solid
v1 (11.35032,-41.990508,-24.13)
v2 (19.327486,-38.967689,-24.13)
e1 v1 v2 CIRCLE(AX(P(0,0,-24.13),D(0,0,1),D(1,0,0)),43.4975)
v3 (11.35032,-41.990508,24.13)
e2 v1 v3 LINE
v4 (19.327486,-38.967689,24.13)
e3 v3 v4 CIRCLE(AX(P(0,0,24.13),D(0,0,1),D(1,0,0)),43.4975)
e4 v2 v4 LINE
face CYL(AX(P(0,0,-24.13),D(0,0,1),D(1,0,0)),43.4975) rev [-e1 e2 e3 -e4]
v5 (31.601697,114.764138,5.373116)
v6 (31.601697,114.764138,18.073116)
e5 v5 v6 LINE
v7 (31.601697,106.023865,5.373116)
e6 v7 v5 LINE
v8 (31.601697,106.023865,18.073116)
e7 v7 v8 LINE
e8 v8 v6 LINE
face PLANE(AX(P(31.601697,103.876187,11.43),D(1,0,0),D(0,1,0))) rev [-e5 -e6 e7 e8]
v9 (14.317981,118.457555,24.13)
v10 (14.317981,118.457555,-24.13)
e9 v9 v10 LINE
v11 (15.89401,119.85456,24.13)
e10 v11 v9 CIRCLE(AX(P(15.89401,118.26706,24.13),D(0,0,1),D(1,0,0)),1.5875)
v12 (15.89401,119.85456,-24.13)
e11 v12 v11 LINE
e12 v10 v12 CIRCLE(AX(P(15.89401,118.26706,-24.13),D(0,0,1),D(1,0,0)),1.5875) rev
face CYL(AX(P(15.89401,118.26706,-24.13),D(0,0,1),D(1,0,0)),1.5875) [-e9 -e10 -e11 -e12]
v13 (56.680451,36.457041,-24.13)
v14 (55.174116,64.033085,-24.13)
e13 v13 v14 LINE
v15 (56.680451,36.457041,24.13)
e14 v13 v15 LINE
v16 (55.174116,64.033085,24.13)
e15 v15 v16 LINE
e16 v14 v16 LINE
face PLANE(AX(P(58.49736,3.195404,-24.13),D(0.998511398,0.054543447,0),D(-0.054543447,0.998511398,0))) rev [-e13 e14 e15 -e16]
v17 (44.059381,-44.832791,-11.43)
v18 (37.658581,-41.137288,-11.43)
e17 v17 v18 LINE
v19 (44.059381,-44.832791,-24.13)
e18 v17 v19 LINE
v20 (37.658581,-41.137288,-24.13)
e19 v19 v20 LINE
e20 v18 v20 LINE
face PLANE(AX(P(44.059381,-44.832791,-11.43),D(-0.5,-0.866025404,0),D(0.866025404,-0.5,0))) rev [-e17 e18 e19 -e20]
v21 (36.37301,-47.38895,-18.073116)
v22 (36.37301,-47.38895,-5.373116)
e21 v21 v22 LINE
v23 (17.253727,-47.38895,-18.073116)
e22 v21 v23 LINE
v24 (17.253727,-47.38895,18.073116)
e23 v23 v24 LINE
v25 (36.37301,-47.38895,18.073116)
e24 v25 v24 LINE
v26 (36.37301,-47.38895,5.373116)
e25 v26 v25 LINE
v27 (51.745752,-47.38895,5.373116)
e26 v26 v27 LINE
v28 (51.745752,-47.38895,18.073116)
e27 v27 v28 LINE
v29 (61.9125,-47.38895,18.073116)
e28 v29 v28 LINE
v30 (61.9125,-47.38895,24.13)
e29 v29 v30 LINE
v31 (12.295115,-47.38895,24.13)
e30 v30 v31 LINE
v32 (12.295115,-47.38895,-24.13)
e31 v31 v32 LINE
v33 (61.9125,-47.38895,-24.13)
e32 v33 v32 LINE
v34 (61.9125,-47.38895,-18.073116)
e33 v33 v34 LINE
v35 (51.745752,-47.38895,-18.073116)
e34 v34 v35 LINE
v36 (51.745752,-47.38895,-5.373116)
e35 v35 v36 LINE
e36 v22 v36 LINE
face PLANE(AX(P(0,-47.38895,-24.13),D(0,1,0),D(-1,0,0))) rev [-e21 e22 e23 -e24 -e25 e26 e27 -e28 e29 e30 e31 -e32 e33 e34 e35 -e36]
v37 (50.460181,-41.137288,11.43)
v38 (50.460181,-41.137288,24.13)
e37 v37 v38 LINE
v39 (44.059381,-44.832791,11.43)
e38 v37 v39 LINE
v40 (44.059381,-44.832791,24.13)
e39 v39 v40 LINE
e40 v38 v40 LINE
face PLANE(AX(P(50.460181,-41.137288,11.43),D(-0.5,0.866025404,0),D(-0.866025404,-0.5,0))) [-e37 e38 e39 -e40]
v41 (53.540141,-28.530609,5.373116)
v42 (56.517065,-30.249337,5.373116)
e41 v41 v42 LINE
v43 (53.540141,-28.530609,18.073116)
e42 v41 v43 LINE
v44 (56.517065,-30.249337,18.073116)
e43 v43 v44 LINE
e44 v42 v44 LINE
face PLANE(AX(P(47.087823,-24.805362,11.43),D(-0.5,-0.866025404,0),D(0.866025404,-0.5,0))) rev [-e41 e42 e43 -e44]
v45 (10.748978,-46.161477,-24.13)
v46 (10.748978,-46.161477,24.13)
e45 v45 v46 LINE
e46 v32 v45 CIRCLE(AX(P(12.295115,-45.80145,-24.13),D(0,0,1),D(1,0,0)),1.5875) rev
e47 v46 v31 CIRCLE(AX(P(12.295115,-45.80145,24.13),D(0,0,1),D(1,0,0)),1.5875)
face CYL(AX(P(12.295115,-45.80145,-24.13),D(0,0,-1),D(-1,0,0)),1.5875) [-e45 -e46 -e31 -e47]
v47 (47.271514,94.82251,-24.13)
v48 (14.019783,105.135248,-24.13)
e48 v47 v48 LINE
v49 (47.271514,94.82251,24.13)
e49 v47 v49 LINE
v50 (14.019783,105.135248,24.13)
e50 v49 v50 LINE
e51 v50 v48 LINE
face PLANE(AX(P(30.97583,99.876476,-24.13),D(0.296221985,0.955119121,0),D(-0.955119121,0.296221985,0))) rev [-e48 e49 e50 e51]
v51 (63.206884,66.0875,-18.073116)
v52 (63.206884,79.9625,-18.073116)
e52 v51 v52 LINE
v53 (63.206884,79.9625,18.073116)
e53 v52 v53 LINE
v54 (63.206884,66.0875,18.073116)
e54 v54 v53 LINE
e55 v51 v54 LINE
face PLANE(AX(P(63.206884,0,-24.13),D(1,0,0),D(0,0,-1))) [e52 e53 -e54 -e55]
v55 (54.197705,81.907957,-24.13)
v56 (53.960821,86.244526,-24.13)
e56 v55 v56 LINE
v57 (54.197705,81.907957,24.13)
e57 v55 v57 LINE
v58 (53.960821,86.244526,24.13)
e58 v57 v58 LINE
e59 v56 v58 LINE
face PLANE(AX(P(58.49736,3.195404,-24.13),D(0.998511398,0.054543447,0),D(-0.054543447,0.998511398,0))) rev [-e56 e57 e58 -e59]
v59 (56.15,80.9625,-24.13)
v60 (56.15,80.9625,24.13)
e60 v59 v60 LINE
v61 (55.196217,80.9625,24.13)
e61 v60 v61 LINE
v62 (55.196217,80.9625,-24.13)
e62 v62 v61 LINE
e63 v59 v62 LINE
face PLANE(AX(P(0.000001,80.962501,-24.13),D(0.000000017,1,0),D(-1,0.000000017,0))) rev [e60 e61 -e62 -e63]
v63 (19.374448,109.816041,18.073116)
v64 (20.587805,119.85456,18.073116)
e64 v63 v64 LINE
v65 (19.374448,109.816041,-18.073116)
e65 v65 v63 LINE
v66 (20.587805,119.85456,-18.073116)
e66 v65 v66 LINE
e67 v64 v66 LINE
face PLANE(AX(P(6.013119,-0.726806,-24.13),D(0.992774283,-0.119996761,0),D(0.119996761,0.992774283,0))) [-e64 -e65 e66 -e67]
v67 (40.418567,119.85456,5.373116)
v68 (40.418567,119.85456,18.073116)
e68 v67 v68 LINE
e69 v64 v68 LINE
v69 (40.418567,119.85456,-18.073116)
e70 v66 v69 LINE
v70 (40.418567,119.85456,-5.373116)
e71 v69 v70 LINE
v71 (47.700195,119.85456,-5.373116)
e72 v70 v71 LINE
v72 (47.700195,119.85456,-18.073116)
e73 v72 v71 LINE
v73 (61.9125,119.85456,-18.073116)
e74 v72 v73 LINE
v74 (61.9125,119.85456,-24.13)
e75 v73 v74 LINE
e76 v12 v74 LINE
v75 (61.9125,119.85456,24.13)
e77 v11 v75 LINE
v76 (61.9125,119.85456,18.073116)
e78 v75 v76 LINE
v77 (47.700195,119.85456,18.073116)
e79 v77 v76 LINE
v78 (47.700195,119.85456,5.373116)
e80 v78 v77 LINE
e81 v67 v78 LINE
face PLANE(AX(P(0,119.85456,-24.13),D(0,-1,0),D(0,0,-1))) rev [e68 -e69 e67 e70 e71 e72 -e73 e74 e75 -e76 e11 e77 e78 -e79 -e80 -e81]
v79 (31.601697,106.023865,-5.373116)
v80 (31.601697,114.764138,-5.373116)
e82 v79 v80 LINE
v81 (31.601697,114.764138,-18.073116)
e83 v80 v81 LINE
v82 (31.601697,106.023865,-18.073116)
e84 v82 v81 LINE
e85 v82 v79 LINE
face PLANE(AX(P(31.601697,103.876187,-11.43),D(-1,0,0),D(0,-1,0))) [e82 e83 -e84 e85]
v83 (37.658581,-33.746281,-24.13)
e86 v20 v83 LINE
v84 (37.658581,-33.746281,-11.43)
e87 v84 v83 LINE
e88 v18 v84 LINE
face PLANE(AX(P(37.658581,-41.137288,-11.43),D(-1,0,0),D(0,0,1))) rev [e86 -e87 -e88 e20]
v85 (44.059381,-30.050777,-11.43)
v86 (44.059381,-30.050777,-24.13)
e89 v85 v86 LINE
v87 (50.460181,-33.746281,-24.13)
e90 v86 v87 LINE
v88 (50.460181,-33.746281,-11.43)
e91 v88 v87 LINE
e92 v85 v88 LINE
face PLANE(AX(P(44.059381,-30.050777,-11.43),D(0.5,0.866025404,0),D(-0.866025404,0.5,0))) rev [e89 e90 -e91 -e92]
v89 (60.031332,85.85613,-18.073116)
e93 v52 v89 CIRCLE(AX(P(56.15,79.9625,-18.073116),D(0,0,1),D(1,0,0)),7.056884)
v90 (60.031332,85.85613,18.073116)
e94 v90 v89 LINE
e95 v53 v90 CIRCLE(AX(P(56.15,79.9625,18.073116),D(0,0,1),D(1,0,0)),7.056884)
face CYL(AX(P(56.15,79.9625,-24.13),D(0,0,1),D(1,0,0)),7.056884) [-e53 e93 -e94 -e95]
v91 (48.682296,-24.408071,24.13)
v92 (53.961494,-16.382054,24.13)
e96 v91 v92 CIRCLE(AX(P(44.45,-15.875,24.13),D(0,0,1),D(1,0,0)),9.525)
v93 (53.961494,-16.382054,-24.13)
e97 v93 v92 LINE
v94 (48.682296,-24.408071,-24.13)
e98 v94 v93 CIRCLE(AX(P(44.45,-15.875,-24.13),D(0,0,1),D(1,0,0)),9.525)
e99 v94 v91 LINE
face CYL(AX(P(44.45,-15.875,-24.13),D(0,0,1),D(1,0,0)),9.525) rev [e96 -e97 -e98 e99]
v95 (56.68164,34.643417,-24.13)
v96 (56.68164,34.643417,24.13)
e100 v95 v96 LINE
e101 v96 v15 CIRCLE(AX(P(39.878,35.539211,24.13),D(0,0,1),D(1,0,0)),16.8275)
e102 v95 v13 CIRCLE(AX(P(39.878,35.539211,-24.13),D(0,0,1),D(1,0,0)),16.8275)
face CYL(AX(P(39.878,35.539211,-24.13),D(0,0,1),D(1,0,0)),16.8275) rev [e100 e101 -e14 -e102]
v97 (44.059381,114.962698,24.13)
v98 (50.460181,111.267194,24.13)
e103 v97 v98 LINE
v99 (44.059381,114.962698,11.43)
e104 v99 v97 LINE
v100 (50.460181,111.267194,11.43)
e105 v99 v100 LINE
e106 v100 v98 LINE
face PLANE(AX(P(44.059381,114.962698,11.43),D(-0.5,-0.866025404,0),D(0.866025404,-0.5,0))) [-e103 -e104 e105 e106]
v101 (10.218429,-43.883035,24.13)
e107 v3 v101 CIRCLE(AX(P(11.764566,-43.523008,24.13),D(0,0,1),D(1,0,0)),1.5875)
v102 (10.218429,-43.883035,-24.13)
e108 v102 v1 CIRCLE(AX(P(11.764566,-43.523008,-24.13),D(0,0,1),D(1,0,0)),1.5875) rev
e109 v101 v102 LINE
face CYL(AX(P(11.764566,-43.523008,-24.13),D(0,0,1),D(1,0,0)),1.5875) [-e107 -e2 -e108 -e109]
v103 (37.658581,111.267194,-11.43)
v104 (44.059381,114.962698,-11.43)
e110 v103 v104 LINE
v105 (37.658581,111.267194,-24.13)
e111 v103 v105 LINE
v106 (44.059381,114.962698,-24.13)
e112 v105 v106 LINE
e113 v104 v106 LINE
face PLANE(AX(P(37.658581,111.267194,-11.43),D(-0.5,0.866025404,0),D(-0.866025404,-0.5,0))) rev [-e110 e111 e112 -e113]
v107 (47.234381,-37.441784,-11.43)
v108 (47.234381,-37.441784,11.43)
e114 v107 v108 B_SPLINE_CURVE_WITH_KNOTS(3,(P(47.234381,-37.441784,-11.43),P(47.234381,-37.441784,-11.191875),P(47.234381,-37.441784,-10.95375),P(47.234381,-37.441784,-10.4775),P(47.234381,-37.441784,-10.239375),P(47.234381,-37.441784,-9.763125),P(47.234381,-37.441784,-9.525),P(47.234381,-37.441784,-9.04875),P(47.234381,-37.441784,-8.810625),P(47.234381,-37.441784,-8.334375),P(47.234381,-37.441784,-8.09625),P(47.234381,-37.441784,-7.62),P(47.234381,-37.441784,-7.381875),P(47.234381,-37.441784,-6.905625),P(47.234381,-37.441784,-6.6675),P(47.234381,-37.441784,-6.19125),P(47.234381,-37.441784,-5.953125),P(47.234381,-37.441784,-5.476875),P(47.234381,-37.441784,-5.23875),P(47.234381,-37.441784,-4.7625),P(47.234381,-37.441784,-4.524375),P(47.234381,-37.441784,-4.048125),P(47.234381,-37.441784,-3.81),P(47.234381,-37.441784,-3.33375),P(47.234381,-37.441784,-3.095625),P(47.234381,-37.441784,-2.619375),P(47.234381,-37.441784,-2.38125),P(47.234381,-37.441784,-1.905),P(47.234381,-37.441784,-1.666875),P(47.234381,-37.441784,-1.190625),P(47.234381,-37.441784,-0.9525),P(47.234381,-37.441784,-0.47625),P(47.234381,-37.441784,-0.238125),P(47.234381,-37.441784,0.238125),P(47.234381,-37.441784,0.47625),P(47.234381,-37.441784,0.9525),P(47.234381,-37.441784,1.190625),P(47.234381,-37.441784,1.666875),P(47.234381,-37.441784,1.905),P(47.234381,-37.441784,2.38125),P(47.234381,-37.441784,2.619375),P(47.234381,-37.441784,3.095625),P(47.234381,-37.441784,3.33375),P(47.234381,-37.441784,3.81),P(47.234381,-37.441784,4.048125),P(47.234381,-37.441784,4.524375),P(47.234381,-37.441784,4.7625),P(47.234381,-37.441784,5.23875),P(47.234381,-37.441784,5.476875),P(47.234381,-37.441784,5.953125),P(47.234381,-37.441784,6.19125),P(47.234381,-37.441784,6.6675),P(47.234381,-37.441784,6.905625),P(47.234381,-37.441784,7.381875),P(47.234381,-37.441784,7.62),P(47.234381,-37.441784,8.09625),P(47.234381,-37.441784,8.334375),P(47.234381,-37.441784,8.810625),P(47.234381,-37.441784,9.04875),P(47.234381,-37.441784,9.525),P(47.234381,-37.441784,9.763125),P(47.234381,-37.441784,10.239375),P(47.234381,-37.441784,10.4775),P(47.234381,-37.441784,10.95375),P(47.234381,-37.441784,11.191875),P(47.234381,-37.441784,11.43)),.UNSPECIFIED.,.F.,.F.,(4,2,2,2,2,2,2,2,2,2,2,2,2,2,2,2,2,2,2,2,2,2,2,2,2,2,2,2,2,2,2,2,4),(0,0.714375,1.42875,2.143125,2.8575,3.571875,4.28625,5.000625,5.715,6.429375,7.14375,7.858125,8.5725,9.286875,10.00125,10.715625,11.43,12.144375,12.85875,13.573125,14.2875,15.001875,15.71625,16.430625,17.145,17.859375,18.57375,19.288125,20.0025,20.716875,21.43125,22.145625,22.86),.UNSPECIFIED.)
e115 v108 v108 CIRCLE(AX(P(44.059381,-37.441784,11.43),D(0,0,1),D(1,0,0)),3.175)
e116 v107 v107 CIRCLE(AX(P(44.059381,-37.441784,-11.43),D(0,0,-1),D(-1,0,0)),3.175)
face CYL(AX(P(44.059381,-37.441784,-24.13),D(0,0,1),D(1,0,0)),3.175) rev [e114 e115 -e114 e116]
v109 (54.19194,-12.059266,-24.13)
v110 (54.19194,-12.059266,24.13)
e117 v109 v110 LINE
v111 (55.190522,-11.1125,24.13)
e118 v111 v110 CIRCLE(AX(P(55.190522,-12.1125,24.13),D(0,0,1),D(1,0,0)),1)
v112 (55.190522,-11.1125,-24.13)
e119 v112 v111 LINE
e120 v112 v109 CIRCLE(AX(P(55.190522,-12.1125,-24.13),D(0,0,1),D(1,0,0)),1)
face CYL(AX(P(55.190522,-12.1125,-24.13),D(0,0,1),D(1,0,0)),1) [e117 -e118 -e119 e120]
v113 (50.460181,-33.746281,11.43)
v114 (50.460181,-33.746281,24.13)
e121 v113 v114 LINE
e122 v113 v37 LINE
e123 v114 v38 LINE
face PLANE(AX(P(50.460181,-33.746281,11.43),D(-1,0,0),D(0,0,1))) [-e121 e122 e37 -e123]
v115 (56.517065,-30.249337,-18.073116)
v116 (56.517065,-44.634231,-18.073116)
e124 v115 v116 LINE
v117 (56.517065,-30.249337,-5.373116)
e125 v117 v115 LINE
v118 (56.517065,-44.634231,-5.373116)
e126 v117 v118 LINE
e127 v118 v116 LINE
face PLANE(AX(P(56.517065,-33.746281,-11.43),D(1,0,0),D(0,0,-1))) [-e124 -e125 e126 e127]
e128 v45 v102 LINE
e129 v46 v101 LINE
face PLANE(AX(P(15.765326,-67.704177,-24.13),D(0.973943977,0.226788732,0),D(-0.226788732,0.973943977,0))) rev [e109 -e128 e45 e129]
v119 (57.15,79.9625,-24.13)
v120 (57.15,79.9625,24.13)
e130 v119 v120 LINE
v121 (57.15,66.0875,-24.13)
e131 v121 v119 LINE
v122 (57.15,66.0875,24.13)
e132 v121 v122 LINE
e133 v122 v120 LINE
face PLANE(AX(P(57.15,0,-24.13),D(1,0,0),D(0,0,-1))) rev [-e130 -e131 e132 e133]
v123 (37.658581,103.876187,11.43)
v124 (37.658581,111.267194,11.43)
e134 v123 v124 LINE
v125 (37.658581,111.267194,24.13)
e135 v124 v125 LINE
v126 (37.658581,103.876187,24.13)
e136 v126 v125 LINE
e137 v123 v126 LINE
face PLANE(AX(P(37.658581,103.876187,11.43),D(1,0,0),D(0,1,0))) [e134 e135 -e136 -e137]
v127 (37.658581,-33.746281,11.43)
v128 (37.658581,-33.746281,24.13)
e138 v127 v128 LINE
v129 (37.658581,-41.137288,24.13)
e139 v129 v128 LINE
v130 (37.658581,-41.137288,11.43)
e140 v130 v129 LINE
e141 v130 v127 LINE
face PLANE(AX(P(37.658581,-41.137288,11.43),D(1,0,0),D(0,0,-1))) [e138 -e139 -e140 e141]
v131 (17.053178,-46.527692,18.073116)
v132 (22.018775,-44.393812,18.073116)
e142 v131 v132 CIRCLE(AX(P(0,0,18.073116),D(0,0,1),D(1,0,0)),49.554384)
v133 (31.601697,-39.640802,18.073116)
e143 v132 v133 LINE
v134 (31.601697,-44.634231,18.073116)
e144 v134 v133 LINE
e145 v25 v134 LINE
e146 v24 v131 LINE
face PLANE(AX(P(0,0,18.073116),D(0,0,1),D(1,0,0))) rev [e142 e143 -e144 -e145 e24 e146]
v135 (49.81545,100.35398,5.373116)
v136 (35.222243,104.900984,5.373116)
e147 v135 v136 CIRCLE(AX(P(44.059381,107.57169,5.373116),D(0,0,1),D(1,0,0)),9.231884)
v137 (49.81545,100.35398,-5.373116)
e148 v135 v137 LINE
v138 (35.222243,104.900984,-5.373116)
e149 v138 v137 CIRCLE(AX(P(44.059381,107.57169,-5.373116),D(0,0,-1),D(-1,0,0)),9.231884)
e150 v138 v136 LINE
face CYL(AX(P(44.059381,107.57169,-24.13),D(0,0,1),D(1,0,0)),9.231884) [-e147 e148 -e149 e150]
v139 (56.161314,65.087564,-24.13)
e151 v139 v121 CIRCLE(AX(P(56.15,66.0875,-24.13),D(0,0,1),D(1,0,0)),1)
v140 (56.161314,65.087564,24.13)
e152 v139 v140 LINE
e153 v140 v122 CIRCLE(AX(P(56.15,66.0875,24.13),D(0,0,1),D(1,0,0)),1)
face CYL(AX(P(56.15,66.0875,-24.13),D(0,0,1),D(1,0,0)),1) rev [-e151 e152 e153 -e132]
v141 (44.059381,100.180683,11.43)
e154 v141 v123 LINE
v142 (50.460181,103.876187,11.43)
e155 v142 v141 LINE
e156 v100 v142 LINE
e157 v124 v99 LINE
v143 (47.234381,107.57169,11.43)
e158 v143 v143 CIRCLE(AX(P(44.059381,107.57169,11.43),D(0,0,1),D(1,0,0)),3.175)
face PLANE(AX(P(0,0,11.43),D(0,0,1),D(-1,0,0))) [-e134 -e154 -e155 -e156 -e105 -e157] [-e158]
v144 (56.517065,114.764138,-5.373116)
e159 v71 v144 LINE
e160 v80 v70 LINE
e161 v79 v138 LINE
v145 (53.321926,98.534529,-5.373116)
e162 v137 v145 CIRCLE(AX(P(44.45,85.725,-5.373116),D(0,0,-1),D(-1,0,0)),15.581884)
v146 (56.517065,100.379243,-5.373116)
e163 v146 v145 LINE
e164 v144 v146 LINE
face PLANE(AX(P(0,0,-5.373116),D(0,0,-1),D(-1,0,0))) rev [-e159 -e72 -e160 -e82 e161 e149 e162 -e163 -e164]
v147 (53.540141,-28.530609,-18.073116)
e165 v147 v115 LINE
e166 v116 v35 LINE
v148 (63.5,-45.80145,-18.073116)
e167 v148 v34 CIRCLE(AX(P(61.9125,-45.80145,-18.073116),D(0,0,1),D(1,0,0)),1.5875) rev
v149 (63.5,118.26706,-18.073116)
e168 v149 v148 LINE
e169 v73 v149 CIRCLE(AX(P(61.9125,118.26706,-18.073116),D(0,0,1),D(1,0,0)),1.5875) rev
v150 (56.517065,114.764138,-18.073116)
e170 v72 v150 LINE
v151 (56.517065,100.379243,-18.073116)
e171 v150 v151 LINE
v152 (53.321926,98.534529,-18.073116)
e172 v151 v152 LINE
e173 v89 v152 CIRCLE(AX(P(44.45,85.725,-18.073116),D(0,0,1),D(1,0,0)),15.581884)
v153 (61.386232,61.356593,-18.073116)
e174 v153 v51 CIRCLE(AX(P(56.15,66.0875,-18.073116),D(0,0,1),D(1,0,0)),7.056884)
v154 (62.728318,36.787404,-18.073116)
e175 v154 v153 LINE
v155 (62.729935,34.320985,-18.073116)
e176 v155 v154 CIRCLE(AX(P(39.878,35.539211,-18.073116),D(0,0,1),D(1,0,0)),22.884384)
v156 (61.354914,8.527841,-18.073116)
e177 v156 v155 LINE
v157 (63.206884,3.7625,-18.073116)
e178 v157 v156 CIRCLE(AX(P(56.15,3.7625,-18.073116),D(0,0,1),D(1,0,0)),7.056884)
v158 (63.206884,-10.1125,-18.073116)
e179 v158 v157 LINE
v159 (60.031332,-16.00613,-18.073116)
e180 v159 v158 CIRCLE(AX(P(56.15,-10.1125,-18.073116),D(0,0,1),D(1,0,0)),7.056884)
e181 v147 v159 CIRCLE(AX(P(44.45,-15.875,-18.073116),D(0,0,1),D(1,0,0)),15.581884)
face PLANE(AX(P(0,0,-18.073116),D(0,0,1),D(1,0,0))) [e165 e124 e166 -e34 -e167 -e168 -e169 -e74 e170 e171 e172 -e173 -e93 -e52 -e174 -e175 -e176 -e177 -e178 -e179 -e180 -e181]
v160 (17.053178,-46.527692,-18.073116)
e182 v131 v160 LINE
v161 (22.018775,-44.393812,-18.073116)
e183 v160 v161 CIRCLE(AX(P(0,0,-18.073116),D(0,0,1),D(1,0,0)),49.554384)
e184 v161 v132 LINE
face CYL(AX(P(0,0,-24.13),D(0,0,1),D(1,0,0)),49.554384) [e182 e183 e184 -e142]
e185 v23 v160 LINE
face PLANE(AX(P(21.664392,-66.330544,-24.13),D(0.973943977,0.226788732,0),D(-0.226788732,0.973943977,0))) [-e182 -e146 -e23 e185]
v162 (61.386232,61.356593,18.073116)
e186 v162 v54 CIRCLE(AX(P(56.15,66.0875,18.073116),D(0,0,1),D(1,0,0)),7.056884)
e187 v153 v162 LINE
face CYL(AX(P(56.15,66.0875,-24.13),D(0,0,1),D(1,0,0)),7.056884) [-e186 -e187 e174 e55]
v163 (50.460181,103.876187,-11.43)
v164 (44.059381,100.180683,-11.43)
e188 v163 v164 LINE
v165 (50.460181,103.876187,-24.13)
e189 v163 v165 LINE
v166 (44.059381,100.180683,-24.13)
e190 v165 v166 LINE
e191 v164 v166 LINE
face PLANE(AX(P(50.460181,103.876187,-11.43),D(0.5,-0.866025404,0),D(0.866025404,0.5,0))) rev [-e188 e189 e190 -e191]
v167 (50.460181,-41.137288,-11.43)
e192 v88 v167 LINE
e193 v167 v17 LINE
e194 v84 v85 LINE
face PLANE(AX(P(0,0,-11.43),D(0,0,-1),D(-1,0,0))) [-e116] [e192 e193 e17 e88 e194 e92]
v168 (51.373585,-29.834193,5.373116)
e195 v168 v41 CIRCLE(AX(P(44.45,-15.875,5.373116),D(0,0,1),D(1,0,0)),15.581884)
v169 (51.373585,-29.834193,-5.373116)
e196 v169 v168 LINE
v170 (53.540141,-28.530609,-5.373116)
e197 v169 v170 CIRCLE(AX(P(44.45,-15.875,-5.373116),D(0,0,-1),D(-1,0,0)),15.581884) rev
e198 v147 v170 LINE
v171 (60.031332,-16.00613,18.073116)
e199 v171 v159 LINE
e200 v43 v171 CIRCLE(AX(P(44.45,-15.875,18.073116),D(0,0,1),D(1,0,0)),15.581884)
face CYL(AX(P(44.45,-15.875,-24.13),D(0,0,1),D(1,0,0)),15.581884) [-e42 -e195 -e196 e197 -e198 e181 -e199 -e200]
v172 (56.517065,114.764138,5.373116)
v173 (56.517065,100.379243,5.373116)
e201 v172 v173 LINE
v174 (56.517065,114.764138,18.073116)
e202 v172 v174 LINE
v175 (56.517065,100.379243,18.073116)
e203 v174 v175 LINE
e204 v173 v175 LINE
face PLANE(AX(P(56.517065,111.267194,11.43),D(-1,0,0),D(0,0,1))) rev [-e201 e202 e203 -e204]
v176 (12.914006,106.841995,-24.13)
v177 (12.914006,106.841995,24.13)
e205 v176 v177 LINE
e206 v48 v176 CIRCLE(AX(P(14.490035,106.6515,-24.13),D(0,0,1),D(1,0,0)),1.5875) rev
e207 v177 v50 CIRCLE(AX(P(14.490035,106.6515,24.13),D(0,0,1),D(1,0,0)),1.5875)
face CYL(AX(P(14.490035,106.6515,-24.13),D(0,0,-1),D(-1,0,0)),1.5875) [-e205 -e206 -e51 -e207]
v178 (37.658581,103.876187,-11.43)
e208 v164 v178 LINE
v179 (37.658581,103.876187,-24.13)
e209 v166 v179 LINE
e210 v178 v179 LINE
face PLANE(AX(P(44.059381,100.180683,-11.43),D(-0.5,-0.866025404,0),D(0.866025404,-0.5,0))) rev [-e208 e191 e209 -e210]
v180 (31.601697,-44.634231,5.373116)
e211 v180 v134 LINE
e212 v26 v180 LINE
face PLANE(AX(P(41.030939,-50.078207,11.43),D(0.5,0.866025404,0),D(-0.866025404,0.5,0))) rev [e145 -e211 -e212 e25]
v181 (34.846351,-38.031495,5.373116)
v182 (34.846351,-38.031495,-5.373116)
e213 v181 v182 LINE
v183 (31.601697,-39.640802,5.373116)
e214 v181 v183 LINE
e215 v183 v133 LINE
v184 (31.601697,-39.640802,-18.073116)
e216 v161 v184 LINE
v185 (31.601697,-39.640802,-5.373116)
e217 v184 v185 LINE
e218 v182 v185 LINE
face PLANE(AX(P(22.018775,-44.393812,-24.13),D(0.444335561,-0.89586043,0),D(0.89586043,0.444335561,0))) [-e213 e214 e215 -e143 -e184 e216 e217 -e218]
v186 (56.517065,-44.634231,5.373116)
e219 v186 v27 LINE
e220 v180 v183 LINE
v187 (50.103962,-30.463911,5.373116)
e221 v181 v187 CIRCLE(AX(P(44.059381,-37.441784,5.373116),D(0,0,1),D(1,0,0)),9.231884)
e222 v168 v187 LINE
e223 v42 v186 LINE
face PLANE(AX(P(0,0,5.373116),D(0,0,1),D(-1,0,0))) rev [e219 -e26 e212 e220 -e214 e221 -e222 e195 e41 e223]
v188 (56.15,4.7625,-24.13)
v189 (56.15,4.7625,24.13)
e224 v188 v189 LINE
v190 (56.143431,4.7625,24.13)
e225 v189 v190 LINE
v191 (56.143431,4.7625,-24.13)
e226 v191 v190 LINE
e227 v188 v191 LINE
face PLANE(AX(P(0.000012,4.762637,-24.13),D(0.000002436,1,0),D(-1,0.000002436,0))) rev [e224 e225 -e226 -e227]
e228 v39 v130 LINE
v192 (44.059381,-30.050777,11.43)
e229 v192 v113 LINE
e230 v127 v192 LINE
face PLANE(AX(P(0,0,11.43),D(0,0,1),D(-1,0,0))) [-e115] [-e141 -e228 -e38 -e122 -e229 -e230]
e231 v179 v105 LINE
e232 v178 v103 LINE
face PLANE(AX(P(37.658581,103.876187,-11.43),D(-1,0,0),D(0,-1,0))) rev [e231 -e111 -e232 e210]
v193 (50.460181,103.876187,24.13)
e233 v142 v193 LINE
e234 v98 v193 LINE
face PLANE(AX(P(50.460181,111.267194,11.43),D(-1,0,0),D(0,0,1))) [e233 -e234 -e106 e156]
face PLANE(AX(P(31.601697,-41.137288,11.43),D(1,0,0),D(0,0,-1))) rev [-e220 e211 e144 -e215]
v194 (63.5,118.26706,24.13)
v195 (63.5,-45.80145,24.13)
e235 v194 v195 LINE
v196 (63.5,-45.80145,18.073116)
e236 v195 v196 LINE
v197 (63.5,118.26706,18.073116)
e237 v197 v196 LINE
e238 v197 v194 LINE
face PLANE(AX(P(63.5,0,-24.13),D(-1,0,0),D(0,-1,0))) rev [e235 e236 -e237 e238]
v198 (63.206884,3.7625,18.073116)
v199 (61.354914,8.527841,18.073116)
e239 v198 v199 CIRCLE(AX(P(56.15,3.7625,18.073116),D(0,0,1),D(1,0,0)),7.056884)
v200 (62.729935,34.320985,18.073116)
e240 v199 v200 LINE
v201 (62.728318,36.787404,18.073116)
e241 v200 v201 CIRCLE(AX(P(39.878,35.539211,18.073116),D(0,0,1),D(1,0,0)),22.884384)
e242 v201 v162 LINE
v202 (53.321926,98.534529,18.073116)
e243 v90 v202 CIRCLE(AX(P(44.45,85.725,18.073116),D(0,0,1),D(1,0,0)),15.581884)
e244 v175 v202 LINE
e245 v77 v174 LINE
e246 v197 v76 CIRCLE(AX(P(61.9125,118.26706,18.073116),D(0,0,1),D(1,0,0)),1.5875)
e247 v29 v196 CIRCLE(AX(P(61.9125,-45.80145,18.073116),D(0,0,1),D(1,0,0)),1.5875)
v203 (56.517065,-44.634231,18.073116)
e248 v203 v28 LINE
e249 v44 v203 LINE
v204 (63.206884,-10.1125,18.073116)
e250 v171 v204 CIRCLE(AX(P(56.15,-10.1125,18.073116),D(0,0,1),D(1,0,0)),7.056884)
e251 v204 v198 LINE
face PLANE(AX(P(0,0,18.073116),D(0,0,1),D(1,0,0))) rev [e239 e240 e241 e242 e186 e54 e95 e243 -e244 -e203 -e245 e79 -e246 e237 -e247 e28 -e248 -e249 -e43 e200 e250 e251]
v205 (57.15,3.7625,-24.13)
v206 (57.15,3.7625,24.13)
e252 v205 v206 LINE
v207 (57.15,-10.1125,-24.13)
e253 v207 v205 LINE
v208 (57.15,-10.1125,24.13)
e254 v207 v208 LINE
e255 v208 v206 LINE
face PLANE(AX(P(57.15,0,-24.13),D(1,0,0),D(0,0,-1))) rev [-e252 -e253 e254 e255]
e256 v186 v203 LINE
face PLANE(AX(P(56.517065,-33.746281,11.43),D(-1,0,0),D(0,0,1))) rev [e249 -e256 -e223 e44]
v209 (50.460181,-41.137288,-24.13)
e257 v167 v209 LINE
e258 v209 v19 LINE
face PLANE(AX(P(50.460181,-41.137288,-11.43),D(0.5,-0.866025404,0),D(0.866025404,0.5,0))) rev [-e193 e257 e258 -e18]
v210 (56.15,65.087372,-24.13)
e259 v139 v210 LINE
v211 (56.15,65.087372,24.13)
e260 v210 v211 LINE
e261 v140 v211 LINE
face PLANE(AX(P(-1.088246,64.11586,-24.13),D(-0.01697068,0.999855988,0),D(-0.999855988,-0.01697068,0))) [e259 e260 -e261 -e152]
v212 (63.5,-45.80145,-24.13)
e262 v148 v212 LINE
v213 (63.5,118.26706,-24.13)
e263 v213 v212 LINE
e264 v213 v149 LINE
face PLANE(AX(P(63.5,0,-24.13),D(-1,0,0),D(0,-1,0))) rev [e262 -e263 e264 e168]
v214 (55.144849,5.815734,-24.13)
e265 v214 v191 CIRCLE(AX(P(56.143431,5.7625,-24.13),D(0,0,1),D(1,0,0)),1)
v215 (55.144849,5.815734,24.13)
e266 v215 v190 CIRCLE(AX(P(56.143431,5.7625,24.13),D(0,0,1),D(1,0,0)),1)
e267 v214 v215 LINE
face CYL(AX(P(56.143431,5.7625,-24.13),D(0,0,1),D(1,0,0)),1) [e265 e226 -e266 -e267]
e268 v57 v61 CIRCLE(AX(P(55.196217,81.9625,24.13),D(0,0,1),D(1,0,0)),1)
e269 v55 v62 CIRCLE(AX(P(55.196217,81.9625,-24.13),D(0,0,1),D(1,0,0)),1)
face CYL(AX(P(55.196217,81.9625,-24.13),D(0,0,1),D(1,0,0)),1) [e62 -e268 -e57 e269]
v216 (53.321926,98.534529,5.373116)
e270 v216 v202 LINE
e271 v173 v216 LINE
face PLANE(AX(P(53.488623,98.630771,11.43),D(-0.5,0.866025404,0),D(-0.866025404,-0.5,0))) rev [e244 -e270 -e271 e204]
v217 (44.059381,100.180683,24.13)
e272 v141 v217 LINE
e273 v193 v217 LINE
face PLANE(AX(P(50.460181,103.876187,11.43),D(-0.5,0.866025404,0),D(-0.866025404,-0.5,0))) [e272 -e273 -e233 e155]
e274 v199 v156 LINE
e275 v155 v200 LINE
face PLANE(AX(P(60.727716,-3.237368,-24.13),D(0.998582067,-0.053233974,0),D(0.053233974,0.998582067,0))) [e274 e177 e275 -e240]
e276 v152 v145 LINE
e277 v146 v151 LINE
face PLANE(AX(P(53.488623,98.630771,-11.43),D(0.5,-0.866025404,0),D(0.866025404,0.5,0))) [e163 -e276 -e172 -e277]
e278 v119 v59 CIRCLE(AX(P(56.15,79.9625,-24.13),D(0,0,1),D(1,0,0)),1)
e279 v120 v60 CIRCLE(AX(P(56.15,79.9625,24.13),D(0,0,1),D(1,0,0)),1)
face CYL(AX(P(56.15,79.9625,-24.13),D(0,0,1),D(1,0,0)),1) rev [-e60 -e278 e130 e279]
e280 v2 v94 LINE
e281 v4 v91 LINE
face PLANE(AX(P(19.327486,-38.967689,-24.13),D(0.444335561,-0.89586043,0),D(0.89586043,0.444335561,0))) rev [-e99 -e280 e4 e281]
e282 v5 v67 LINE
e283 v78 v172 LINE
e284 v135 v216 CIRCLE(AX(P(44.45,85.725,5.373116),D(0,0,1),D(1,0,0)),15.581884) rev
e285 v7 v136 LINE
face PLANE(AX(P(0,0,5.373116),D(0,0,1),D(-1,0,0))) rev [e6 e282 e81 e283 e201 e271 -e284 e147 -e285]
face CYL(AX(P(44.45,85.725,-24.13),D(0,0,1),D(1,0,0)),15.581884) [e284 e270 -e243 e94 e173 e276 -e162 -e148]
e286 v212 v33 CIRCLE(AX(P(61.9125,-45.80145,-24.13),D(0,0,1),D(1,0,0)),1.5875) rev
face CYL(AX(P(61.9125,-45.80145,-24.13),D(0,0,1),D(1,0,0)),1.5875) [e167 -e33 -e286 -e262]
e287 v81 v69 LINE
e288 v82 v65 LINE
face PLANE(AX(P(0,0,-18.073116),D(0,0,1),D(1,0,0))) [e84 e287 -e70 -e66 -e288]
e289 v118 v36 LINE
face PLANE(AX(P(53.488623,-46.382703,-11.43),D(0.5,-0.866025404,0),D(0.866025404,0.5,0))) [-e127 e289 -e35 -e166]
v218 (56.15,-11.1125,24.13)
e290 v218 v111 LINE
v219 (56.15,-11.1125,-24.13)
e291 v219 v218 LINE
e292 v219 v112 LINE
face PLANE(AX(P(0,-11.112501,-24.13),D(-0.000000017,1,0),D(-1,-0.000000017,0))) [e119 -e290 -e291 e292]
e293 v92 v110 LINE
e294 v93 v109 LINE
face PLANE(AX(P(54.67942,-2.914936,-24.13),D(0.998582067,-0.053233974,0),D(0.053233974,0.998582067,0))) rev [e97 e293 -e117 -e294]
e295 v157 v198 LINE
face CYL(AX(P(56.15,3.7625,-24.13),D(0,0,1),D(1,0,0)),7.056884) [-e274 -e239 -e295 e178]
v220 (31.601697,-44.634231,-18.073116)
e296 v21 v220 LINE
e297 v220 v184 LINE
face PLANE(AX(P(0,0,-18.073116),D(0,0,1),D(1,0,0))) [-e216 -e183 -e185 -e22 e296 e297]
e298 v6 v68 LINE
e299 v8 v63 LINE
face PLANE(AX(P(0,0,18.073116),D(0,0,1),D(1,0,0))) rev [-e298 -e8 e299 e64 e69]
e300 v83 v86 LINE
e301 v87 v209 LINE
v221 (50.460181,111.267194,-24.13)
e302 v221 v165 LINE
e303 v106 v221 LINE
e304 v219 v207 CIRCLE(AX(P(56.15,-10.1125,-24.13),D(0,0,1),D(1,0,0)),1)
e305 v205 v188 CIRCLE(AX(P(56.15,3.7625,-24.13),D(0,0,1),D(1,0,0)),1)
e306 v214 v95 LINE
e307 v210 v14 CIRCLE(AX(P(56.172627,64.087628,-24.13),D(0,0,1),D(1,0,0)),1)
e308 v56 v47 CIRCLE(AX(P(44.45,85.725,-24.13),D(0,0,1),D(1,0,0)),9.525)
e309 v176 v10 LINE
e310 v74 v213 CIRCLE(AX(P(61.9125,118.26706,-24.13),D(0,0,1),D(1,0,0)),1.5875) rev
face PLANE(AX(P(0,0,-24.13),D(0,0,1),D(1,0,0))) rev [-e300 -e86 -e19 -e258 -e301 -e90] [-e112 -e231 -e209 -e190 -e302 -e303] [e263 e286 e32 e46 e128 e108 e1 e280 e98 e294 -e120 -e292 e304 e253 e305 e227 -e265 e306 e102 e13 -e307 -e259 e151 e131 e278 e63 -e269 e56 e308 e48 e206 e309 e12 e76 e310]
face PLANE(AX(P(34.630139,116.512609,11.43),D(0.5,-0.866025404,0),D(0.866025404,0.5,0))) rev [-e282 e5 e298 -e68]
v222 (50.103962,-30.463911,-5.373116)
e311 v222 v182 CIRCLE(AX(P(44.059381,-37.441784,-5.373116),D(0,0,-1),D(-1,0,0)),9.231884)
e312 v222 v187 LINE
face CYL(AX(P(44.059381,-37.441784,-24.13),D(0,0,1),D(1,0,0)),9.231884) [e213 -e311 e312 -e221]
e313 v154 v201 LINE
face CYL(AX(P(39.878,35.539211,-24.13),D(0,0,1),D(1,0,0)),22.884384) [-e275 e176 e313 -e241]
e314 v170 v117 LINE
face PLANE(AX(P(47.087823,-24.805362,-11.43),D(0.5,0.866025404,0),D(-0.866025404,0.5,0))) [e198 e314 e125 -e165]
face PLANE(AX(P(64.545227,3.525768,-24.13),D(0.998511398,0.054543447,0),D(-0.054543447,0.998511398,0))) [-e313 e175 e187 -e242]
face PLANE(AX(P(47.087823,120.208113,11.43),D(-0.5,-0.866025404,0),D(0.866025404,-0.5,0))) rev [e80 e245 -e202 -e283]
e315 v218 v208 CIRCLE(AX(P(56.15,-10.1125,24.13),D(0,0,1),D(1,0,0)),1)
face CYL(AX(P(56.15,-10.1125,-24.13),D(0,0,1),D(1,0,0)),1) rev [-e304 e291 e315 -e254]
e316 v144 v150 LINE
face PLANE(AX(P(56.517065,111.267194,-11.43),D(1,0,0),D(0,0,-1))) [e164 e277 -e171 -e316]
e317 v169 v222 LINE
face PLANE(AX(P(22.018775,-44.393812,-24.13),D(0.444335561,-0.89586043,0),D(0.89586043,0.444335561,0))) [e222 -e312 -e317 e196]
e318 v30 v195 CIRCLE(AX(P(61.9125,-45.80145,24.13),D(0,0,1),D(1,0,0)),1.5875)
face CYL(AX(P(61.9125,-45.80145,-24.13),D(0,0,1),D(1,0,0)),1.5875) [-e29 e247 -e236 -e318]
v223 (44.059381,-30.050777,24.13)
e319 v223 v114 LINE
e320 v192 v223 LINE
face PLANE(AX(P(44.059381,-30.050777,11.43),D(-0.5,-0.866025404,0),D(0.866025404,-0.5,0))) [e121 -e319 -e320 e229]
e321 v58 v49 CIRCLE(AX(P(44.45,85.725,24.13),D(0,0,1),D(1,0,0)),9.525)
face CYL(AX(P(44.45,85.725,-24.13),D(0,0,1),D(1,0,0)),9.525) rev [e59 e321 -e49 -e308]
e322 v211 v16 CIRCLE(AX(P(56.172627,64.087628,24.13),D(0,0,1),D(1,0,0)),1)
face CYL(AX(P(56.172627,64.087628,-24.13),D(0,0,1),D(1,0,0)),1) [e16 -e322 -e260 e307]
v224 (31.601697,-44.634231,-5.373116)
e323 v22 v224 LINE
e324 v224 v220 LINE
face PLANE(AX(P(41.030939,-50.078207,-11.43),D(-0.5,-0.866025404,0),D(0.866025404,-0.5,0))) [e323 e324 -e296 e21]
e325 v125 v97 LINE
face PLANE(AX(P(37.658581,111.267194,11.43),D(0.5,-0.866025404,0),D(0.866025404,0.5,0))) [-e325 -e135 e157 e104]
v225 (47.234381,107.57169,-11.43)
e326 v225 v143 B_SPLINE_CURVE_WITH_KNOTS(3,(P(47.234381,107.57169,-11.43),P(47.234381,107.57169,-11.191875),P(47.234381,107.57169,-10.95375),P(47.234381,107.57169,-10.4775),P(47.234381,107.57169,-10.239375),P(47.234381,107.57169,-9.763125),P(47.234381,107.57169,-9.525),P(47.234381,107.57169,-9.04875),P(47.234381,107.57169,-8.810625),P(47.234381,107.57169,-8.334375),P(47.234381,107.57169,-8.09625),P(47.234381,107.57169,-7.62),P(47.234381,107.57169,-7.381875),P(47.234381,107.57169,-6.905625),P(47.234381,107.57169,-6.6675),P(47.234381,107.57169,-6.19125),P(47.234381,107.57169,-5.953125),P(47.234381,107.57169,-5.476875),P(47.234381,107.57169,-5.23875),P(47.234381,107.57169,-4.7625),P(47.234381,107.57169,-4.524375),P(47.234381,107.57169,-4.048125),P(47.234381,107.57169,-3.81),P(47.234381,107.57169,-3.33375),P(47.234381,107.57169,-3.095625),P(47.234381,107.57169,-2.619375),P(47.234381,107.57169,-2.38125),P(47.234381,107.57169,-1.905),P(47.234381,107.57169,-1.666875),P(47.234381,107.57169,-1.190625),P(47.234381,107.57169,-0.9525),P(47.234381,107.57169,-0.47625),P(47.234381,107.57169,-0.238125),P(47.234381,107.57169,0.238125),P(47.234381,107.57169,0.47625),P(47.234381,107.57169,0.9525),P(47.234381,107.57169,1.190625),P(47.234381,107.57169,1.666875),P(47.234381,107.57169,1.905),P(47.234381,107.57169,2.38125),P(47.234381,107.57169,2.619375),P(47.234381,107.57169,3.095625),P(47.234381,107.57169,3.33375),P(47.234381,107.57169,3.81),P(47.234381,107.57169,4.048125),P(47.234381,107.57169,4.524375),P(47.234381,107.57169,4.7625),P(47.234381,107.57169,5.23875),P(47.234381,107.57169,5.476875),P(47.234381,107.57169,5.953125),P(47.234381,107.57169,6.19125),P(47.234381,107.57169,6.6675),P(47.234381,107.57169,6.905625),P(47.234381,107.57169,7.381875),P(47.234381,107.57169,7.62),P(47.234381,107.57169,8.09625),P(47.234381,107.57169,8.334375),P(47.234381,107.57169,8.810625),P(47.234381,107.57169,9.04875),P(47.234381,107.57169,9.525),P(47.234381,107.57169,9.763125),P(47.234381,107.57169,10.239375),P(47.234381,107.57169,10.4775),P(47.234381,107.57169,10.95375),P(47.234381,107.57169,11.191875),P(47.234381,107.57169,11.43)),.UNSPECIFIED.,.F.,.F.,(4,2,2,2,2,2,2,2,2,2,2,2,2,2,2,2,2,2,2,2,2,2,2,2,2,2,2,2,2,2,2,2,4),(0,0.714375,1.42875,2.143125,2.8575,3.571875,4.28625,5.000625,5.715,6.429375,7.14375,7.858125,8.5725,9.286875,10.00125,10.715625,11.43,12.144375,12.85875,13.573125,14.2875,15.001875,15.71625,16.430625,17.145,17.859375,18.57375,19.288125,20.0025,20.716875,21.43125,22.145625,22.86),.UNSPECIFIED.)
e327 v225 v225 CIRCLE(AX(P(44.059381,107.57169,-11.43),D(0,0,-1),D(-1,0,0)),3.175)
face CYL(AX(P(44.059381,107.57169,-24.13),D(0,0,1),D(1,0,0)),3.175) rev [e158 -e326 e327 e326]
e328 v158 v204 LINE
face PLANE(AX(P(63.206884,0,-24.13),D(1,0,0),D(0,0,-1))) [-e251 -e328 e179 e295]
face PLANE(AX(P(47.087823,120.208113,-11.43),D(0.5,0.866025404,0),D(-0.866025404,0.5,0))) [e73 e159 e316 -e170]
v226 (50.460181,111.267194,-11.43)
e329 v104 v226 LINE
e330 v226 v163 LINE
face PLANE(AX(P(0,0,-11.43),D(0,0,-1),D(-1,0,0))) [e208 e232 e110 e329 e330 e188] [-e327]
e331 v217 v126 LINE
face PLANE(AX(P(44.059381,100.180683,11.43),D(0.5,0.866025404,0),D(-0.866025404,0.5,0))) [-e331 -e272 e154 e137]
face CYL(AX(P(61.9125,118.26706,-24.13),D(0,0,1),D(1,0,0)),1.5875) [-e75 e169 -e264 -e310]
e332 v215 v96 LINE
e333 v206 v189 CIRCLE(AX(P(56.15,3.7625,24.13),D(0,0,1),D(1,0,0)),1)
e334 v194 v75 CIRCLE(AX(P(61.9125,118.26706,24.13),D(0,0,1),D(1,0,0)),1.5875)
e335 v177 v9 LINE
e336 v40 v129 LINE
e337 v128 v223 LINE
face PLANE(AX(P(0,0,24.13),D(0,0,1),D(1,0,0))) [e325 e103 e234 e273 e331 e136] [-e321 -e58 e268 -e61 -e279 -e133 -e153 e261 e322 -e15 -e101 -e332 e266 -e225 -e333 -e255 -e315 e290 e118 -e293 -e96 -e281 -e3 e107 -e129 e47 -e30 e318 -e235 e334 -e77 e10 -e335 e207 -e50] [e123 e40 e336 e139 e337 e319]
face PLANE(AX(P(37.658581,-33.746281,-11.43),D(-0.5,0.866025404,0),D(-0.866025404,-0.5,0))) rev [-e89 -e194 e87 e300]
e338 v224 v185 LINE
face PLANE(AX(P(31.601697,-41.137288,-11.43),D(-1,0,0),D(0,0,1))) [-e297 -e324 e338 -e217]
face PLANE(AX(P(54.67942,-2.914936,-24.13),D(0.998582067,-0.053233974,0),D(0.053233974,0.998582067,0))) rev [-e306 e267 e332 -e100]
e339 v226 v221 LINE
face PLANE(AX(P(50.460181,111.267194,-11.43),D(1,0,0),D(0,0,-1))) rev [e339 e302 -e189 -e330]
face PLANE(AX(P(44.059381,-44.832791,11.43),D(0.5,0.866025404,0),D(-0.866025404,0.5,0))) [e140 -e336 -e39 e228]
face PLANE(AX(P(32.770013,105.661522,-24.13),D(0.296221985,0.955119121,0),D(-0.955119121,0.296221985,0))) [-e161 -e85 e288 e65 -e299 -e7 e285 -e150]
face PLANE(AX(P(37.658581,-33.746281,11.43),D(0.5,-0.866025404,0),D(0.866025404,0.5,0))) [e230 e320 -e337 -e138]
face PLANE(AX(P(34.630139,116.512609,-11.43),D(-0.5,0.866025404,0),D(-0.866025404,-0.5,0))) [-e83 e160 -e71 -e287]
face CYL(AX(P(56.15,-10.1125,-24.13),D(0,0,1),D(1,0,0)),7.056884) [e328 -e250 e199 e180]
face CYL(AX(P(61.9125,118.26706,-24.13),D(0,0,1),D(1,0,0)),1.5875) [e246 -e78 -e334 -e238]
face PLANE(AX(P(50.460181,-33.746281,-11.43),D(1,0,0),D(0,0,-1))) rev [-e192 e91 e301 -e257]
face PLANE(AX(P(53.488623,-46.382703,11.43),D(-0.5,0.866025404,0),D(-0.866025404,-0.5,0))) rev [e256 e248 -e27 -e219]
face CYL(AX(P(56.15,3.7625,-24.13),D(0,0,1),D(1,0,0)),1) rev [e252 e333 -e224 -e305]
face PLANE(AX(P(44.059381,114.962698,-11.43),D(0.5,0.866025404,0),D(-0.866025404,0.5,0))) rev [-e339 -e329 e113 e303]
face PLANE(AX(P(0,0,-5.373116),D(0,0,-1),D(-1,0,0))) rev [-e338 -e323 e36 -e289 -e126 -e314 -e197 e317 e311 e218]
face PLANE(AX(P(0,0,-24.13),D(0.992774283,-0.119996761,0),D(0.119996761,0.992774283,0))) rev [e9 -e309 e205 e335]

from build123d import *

# Parameters (mm, degrees)
BOSS_EXTRUDE1_DEPTH     = 24.13
CUT_EXTRUDE1_DEPTH      = 138.766550514
CUT_EXTRUDE1_DEPTH_BACK = 138.766550514
FILLET1_R               = 1.5875
CUT_EXTRUDE2_DEPTH      = 12.7
CUT_EXTRUDE3_DEPTH      = 138.766550514
CUT_EXTRUDE3_DEPTH_BACK = 138.766550514
SKETCH4_R               = 3.175
SHELL1_START            = -18.073116
SHELL1_DEPTH            = 36.146232
SHELL1_START_2          = -5.373116
SHELL1_2_DEPTH          = 10.746232


# Read off the part's stored shape, not the designer's step: Shell1
with BuildPart() as part:
    # Sketch1 → Boss-Extrude1 (new, symmetric)
    with BuildSketch(Plane.XY):
        with BuildLine():
            Line((56.161313585, 65.087564001), (56.15, 65.087371974))
            ThreePointArc((56.15, 65.087371974), (55.438759683, 64.766920639), (55.174115771, 64.033084522))
            Line((55.174115771, 64.033084522), (56.680450554, 36.457041128))
            ThreePointArc((56.680450554, 36.457041128), (56.705496383, 35.550244887), (56.681639728, 34.643416582))
            Line((56.681639728, 34.643416582), (55.144848554, 5.815734008))
            ThreePointArc((55.144848554, 5.815734008), (55.417746823, 5.074471658), (56.143430652, 4.7625))
            Line((56.143430652, 4.7625), (56.149999968, 4.762499984))
            ThreePointArc((56.149999968, 4.762499984), (56.857106771, 4.469606766), (57.15, 3.762499968))
            Line((57.15, 3.762499968), (57.15, -10.112499968))
            ThreePointArc((57.15, -10.112499968), (56.857106771, -10.819606766), (56.149999968, -11.112499984))
            Line((56.149999968, -11.112499984), (55.190522202, -11.1125))
            ThreePointArc((55.190522202, -11.1125), (54.502493828, -11.386816202), (54.191940103, -12.059266056))
            Line((54.191940103, -12.059266056), (53.961494186, -16.382053603))
            ThreePointArc((53.961494186, -16.382053603), (52.407837698, -21.109352316), (48.682296217, -24.408070592))
            Line((48.682296217, -24.408070592), (19.327486058, -38.967689038))
            ThreePointArc((19.327486058, -38.967689038), (0, -43.4975), (-19.327486058, -38.967689038))
            Line((-19.327486058, -38.967689038), (-19.327486058, -47.388950103))
            Line((-19.327486058, -47.388950103), (63.5, -47.388950103))
            Line((63.5, -47.388950103), (63.5, 119.854559949))
            Line((63.5, 119.854559949), (-4.702524006, 119.854559949))
            Line((-4.702524006, 119.854559949), (-4.702524006, 108.02491605))
            ThreePointArc((-4.702524006, 108.02491605), (0, 108.7374), (4.702524006, 108.02491605))
            Line((4.702524006, 108.02491605), (47.271514403, 94.82250963))
            ThreePointArc((47.271514403, 94.82250963), (51.961130003, 91.582350175), (53.960821068, 86.244526329))
            Line((53.960821068, 86.244526329), (54.197705155, 81.907956584))
            ThreePointArc((54.197705155, 81.907956584), (54.508664182, 81.236365226), (55.196216585, 80.9625))
            Line((55.196216585, 80.9625), (56.149999984, 80.962499984))
            ThreePointArc((56.149999984, 80.962499984), (56.857106777, 80.669606761), (57.15, 79.962499968))
            Line((57.15, 79.962499968), (57.15, 66.087500032))
            ThreePointArc((57.15, 66.087500032), (56.8610955, 65.384404568), (56.161313585, 65.087564001))
        make_face()
    extrude(amount=BOSS_EXTRUDE1_DEPTH, both=True)

    # Sketch2 → Cut-Extrude1 (cut, two sides: drawn at the far end of the back side and taken through both)
    with BuildSketch(Plane.XY.offset(-CUT_EXTRUDE1_DEPTH_BACK)):
        Polygon((0, 0), (16.649604997, 137.747881839), (-33.336773011, 132.313158031), (-32.126746787, -67.704176811), (15.765326083, -67.704176811), align=None)
    extrude(amount=CUT_EXTRUDE1_DEPTH + CUT_EXTRUDE1_DEPTH_BACK, mode=Mode.SUBTRACT)

    # Fillet1
    fillet1_edges = [part.edges().sort_by_distance(p)[0] for p in [
        (63.5, 119.854559949, 0),
        (63.5, -47.388950103, 0),
        (11.034802966, -47.388950103, 0),
        (9.864742858, -42.364128158, 0),
        (12.755119811, 105.527472687, 0),
        (14.486836775, 119.854559949, 0),
    ]]
    fillet(fillet1_edges, radius=FILLET1_R)

    # Sketch3 → Cut-Extrude2 (cut)
    with BuildSketch(Plane(origin=(0, 0, -24.13), x_dir=(-1, 0, 0), z_dir=(0, 0, -1))):
        Polygon((-44.059380862, -30.050777043), (-50.460180862, -33.746280646), (-50.460180862, -41.137287852), (-44.059380862, -44.832791455), (-37.658580862, -41.137287852), (-37.658580862, -33.746280646), align=None)
        Polygon((-37.658580862, 111.2671939), (-44.059380862, 114.962697503), (-50.460180862, 111.2671939), (-50.460180862, 103.876186694), (-44.059380862, 100.180683091), (-37.658580862, 103.876186694), align=None)
    cut_extrude2 = extrude(amount=-CUT_EXTRUDE2_DEPTH, mode=Mode.SUBTRACT)

    # Mirror1: Cut-Extrude2 across plane
    add(cut_extrude2.mirror(Plane.XY), mode=Mode.SUBTRACT)

    # Sketch4 → Cut-Extrude3 (cut, two sides: drawn at the far end of the back side and taken through both)
    with BuildSketch(Plane.XY.offset(-CUT_EXTRUDE3_DEPTH_BACK)):
        with Locations((44.059380862, 107.571690297)):
            Circle(SKETCH4_R)
        with Locations((44.059380862, -37.441784249)):
            Circle(SKETCH4_R)
    extrude(amount=CUT_EXTRUDE3_DEPTH + CUT_EXTRUDE3_DEPTH_BACK, mode=Mode.SUBTRACT)

    # Shell1 outline → Shell1 (cut)
    with BuildSketch(Plane.XY.offset(SHELL1_START)):
        with BuildLine():
            ThreePointArc((60.031332227, -16.006129752), (58.284234513, -23.045011467), (53.540141007, -28.530609249))
            Line((53.540141007, -28.530609249), (56.517064862, -30.249337038))
            Line((56.517064862, -30.249337038), (56.517064862, -44.63423146))
            Line((56.517064862, -44.63423146), (51.745752212, -47.388950103))
            Line((51.745752212, -47.388950103), (61.9125, -47.388950103))
            ThreePointArc((61.9125, -47.388950103), (63.035032015, -46.923982118), (63.5, -45.801450103))
            Line((63.5, -45.801450103), (63.5, 118.267059949))
            ThreePointArc((63.5, 118.267059949), (63.035032015, 119.389591964), (61.9125, 119.854559949))
            Line((61.9125, 119.854559949), (47.700194563, 119.854559949))
            Line((47.700194563, 119.854559949), (56.517064862, 114.764137508))
            Line((56.517064862, 114.764137508), (56.517064862, 100.379243086))
            Line((56.517064862, 100.379243086), (53.321926303, 98.534528979))
            ThreePointArc((53.321926303, 98.534528979), (58.222287934, 93.013291574), (60.031332227, 85.856129752))
            ThreePointArc((60.031332227, 85.856129752), (62.362476281, 83.309849707), (63.206884, 79.962499968))
            Line((63.206884, 79.962499968), (63.206884008, 66.087500032))
            ThreePointArc((63.206884008, 66.087500032), (62.736011515, 63.552926254), (61.386232226, 61.356592716))
            Line((61.386232226, 61.356592716), (62.728318266, 36.787404457))
            ThreePointArc((62.728318266, 36.787404457), (62.762379081, 35.55421632), (62.729935471, 34.320984576))
            Line((62.729935471, 34.320984576), (61.354914269, 8.527841436))
            ThreePointArc((61.354914269, 8.527841436), (62.727616894, 6.318780038), (63.206884, 3.762499968))
            Line((63.206884, 3.762499968), (63.206884, -10.112499968))
            ThreePointArc((63.206884, -10.112499968), (62.362476281, -13.459849707), (60.031332227, -16.006129752))
        make_face()
        with BuildLine():
            Line((31.601696862, -44.63423146), (31.601696862, -39.640802436))
            Line((31.601696862, -39.640802436), (22.018775007, -44.39381174))
            ThreePointArc((22.018775007, -44.39381174), (19.565089882, -45.528499114), (17.053178169, -46.527691625))
            Line((17.053178169, -46.527691625), (17.253727402, -47.388950103))
            Line((17.253727402, -47.388950103), (36.373009512, -47.388950103))
            Line((36.373009512, -47.388950103), (31.601696862, -44.63423146))
        make_face()
        Polygon((31.601696862, 114.764137508), (40.418567161, 119.854559949), (20.587804641, 119.854559949), (19.374447508, 109.816041015), (31.601696862, 106.023864741), align=None)
    extrude(amount=SHELL1_DEPTH, mode=Mode.SUBTRACT)

    # Shell1 2 outline → Shell1 2 (cut)
    with BuildSketch(Plane.XY.offset(SHELL1_START_2)):
        with BuildLine():
            ThreePointArc((53.540141007, -28.530609249), (52.483348575, -29.226420137), (51.373585166, -29.834193295))
            Line((51.373585166, -29.834193295), (50.103961944, -30.463910523))
            ThreePointArc((50.103961944, -30.463910523), (48.161435217, -45.712263816), (34.846350755, -38.031494714))
            Line((34.846350755, -38.031494714), (31.601696862, -39.640802436))
            Line((31.601696862, -39.640802436), (31.601696862, -44.63423146))
            Line((31.601696862, -44.63423146), (36.373009512, -47.388950103))
            Line((36.373009512, -47.388950103), (51.745752212, -47.388950103))
            Line((51.745752212, -47.388950103), (56.517064862, -44.63423146))
            Line((56.517064862, -44.63423146), (56.517064862, -30.249337038))
            Line((56.517064862, -30.249337038), (53.540141007, -28.530609249))
        make_face()
        with BuildLine():
            Line((56.517064862, 114.764137508), (47.700194563, 119.854559949))
            Line((47.700194563, 119.854559949), (40.418567161, 119.854559949))
            Line((40.418567161, 119.854559949), (31.601696862, 114.764137508))
            Line((31.601696862, 114.764137508), (31.601696862, 106.023864741))
            Line((31.601696862, 106.023864741), (35.222242894, 104.900983514))
            ThreePointArc((35.222242894, 104.900983514), (46.805661297, 116.385635269), (49.81545048, 100.353979805))
            ThreePointArc((49.81545048, 100.353979805), (51.626581689, 99.555827316), (53.321926303, 98.534528979))
            Line((53.321926303, 98.534528979), (56.517064862, 100.379243086))
            Line((56.517064862, 100.379243086), (56.517064862, 114.764137508))
        make_face()
    extrude(amount=SHELL1_2_DEPTH, mode=Mode.SUBTRACT)


solid = part.part
